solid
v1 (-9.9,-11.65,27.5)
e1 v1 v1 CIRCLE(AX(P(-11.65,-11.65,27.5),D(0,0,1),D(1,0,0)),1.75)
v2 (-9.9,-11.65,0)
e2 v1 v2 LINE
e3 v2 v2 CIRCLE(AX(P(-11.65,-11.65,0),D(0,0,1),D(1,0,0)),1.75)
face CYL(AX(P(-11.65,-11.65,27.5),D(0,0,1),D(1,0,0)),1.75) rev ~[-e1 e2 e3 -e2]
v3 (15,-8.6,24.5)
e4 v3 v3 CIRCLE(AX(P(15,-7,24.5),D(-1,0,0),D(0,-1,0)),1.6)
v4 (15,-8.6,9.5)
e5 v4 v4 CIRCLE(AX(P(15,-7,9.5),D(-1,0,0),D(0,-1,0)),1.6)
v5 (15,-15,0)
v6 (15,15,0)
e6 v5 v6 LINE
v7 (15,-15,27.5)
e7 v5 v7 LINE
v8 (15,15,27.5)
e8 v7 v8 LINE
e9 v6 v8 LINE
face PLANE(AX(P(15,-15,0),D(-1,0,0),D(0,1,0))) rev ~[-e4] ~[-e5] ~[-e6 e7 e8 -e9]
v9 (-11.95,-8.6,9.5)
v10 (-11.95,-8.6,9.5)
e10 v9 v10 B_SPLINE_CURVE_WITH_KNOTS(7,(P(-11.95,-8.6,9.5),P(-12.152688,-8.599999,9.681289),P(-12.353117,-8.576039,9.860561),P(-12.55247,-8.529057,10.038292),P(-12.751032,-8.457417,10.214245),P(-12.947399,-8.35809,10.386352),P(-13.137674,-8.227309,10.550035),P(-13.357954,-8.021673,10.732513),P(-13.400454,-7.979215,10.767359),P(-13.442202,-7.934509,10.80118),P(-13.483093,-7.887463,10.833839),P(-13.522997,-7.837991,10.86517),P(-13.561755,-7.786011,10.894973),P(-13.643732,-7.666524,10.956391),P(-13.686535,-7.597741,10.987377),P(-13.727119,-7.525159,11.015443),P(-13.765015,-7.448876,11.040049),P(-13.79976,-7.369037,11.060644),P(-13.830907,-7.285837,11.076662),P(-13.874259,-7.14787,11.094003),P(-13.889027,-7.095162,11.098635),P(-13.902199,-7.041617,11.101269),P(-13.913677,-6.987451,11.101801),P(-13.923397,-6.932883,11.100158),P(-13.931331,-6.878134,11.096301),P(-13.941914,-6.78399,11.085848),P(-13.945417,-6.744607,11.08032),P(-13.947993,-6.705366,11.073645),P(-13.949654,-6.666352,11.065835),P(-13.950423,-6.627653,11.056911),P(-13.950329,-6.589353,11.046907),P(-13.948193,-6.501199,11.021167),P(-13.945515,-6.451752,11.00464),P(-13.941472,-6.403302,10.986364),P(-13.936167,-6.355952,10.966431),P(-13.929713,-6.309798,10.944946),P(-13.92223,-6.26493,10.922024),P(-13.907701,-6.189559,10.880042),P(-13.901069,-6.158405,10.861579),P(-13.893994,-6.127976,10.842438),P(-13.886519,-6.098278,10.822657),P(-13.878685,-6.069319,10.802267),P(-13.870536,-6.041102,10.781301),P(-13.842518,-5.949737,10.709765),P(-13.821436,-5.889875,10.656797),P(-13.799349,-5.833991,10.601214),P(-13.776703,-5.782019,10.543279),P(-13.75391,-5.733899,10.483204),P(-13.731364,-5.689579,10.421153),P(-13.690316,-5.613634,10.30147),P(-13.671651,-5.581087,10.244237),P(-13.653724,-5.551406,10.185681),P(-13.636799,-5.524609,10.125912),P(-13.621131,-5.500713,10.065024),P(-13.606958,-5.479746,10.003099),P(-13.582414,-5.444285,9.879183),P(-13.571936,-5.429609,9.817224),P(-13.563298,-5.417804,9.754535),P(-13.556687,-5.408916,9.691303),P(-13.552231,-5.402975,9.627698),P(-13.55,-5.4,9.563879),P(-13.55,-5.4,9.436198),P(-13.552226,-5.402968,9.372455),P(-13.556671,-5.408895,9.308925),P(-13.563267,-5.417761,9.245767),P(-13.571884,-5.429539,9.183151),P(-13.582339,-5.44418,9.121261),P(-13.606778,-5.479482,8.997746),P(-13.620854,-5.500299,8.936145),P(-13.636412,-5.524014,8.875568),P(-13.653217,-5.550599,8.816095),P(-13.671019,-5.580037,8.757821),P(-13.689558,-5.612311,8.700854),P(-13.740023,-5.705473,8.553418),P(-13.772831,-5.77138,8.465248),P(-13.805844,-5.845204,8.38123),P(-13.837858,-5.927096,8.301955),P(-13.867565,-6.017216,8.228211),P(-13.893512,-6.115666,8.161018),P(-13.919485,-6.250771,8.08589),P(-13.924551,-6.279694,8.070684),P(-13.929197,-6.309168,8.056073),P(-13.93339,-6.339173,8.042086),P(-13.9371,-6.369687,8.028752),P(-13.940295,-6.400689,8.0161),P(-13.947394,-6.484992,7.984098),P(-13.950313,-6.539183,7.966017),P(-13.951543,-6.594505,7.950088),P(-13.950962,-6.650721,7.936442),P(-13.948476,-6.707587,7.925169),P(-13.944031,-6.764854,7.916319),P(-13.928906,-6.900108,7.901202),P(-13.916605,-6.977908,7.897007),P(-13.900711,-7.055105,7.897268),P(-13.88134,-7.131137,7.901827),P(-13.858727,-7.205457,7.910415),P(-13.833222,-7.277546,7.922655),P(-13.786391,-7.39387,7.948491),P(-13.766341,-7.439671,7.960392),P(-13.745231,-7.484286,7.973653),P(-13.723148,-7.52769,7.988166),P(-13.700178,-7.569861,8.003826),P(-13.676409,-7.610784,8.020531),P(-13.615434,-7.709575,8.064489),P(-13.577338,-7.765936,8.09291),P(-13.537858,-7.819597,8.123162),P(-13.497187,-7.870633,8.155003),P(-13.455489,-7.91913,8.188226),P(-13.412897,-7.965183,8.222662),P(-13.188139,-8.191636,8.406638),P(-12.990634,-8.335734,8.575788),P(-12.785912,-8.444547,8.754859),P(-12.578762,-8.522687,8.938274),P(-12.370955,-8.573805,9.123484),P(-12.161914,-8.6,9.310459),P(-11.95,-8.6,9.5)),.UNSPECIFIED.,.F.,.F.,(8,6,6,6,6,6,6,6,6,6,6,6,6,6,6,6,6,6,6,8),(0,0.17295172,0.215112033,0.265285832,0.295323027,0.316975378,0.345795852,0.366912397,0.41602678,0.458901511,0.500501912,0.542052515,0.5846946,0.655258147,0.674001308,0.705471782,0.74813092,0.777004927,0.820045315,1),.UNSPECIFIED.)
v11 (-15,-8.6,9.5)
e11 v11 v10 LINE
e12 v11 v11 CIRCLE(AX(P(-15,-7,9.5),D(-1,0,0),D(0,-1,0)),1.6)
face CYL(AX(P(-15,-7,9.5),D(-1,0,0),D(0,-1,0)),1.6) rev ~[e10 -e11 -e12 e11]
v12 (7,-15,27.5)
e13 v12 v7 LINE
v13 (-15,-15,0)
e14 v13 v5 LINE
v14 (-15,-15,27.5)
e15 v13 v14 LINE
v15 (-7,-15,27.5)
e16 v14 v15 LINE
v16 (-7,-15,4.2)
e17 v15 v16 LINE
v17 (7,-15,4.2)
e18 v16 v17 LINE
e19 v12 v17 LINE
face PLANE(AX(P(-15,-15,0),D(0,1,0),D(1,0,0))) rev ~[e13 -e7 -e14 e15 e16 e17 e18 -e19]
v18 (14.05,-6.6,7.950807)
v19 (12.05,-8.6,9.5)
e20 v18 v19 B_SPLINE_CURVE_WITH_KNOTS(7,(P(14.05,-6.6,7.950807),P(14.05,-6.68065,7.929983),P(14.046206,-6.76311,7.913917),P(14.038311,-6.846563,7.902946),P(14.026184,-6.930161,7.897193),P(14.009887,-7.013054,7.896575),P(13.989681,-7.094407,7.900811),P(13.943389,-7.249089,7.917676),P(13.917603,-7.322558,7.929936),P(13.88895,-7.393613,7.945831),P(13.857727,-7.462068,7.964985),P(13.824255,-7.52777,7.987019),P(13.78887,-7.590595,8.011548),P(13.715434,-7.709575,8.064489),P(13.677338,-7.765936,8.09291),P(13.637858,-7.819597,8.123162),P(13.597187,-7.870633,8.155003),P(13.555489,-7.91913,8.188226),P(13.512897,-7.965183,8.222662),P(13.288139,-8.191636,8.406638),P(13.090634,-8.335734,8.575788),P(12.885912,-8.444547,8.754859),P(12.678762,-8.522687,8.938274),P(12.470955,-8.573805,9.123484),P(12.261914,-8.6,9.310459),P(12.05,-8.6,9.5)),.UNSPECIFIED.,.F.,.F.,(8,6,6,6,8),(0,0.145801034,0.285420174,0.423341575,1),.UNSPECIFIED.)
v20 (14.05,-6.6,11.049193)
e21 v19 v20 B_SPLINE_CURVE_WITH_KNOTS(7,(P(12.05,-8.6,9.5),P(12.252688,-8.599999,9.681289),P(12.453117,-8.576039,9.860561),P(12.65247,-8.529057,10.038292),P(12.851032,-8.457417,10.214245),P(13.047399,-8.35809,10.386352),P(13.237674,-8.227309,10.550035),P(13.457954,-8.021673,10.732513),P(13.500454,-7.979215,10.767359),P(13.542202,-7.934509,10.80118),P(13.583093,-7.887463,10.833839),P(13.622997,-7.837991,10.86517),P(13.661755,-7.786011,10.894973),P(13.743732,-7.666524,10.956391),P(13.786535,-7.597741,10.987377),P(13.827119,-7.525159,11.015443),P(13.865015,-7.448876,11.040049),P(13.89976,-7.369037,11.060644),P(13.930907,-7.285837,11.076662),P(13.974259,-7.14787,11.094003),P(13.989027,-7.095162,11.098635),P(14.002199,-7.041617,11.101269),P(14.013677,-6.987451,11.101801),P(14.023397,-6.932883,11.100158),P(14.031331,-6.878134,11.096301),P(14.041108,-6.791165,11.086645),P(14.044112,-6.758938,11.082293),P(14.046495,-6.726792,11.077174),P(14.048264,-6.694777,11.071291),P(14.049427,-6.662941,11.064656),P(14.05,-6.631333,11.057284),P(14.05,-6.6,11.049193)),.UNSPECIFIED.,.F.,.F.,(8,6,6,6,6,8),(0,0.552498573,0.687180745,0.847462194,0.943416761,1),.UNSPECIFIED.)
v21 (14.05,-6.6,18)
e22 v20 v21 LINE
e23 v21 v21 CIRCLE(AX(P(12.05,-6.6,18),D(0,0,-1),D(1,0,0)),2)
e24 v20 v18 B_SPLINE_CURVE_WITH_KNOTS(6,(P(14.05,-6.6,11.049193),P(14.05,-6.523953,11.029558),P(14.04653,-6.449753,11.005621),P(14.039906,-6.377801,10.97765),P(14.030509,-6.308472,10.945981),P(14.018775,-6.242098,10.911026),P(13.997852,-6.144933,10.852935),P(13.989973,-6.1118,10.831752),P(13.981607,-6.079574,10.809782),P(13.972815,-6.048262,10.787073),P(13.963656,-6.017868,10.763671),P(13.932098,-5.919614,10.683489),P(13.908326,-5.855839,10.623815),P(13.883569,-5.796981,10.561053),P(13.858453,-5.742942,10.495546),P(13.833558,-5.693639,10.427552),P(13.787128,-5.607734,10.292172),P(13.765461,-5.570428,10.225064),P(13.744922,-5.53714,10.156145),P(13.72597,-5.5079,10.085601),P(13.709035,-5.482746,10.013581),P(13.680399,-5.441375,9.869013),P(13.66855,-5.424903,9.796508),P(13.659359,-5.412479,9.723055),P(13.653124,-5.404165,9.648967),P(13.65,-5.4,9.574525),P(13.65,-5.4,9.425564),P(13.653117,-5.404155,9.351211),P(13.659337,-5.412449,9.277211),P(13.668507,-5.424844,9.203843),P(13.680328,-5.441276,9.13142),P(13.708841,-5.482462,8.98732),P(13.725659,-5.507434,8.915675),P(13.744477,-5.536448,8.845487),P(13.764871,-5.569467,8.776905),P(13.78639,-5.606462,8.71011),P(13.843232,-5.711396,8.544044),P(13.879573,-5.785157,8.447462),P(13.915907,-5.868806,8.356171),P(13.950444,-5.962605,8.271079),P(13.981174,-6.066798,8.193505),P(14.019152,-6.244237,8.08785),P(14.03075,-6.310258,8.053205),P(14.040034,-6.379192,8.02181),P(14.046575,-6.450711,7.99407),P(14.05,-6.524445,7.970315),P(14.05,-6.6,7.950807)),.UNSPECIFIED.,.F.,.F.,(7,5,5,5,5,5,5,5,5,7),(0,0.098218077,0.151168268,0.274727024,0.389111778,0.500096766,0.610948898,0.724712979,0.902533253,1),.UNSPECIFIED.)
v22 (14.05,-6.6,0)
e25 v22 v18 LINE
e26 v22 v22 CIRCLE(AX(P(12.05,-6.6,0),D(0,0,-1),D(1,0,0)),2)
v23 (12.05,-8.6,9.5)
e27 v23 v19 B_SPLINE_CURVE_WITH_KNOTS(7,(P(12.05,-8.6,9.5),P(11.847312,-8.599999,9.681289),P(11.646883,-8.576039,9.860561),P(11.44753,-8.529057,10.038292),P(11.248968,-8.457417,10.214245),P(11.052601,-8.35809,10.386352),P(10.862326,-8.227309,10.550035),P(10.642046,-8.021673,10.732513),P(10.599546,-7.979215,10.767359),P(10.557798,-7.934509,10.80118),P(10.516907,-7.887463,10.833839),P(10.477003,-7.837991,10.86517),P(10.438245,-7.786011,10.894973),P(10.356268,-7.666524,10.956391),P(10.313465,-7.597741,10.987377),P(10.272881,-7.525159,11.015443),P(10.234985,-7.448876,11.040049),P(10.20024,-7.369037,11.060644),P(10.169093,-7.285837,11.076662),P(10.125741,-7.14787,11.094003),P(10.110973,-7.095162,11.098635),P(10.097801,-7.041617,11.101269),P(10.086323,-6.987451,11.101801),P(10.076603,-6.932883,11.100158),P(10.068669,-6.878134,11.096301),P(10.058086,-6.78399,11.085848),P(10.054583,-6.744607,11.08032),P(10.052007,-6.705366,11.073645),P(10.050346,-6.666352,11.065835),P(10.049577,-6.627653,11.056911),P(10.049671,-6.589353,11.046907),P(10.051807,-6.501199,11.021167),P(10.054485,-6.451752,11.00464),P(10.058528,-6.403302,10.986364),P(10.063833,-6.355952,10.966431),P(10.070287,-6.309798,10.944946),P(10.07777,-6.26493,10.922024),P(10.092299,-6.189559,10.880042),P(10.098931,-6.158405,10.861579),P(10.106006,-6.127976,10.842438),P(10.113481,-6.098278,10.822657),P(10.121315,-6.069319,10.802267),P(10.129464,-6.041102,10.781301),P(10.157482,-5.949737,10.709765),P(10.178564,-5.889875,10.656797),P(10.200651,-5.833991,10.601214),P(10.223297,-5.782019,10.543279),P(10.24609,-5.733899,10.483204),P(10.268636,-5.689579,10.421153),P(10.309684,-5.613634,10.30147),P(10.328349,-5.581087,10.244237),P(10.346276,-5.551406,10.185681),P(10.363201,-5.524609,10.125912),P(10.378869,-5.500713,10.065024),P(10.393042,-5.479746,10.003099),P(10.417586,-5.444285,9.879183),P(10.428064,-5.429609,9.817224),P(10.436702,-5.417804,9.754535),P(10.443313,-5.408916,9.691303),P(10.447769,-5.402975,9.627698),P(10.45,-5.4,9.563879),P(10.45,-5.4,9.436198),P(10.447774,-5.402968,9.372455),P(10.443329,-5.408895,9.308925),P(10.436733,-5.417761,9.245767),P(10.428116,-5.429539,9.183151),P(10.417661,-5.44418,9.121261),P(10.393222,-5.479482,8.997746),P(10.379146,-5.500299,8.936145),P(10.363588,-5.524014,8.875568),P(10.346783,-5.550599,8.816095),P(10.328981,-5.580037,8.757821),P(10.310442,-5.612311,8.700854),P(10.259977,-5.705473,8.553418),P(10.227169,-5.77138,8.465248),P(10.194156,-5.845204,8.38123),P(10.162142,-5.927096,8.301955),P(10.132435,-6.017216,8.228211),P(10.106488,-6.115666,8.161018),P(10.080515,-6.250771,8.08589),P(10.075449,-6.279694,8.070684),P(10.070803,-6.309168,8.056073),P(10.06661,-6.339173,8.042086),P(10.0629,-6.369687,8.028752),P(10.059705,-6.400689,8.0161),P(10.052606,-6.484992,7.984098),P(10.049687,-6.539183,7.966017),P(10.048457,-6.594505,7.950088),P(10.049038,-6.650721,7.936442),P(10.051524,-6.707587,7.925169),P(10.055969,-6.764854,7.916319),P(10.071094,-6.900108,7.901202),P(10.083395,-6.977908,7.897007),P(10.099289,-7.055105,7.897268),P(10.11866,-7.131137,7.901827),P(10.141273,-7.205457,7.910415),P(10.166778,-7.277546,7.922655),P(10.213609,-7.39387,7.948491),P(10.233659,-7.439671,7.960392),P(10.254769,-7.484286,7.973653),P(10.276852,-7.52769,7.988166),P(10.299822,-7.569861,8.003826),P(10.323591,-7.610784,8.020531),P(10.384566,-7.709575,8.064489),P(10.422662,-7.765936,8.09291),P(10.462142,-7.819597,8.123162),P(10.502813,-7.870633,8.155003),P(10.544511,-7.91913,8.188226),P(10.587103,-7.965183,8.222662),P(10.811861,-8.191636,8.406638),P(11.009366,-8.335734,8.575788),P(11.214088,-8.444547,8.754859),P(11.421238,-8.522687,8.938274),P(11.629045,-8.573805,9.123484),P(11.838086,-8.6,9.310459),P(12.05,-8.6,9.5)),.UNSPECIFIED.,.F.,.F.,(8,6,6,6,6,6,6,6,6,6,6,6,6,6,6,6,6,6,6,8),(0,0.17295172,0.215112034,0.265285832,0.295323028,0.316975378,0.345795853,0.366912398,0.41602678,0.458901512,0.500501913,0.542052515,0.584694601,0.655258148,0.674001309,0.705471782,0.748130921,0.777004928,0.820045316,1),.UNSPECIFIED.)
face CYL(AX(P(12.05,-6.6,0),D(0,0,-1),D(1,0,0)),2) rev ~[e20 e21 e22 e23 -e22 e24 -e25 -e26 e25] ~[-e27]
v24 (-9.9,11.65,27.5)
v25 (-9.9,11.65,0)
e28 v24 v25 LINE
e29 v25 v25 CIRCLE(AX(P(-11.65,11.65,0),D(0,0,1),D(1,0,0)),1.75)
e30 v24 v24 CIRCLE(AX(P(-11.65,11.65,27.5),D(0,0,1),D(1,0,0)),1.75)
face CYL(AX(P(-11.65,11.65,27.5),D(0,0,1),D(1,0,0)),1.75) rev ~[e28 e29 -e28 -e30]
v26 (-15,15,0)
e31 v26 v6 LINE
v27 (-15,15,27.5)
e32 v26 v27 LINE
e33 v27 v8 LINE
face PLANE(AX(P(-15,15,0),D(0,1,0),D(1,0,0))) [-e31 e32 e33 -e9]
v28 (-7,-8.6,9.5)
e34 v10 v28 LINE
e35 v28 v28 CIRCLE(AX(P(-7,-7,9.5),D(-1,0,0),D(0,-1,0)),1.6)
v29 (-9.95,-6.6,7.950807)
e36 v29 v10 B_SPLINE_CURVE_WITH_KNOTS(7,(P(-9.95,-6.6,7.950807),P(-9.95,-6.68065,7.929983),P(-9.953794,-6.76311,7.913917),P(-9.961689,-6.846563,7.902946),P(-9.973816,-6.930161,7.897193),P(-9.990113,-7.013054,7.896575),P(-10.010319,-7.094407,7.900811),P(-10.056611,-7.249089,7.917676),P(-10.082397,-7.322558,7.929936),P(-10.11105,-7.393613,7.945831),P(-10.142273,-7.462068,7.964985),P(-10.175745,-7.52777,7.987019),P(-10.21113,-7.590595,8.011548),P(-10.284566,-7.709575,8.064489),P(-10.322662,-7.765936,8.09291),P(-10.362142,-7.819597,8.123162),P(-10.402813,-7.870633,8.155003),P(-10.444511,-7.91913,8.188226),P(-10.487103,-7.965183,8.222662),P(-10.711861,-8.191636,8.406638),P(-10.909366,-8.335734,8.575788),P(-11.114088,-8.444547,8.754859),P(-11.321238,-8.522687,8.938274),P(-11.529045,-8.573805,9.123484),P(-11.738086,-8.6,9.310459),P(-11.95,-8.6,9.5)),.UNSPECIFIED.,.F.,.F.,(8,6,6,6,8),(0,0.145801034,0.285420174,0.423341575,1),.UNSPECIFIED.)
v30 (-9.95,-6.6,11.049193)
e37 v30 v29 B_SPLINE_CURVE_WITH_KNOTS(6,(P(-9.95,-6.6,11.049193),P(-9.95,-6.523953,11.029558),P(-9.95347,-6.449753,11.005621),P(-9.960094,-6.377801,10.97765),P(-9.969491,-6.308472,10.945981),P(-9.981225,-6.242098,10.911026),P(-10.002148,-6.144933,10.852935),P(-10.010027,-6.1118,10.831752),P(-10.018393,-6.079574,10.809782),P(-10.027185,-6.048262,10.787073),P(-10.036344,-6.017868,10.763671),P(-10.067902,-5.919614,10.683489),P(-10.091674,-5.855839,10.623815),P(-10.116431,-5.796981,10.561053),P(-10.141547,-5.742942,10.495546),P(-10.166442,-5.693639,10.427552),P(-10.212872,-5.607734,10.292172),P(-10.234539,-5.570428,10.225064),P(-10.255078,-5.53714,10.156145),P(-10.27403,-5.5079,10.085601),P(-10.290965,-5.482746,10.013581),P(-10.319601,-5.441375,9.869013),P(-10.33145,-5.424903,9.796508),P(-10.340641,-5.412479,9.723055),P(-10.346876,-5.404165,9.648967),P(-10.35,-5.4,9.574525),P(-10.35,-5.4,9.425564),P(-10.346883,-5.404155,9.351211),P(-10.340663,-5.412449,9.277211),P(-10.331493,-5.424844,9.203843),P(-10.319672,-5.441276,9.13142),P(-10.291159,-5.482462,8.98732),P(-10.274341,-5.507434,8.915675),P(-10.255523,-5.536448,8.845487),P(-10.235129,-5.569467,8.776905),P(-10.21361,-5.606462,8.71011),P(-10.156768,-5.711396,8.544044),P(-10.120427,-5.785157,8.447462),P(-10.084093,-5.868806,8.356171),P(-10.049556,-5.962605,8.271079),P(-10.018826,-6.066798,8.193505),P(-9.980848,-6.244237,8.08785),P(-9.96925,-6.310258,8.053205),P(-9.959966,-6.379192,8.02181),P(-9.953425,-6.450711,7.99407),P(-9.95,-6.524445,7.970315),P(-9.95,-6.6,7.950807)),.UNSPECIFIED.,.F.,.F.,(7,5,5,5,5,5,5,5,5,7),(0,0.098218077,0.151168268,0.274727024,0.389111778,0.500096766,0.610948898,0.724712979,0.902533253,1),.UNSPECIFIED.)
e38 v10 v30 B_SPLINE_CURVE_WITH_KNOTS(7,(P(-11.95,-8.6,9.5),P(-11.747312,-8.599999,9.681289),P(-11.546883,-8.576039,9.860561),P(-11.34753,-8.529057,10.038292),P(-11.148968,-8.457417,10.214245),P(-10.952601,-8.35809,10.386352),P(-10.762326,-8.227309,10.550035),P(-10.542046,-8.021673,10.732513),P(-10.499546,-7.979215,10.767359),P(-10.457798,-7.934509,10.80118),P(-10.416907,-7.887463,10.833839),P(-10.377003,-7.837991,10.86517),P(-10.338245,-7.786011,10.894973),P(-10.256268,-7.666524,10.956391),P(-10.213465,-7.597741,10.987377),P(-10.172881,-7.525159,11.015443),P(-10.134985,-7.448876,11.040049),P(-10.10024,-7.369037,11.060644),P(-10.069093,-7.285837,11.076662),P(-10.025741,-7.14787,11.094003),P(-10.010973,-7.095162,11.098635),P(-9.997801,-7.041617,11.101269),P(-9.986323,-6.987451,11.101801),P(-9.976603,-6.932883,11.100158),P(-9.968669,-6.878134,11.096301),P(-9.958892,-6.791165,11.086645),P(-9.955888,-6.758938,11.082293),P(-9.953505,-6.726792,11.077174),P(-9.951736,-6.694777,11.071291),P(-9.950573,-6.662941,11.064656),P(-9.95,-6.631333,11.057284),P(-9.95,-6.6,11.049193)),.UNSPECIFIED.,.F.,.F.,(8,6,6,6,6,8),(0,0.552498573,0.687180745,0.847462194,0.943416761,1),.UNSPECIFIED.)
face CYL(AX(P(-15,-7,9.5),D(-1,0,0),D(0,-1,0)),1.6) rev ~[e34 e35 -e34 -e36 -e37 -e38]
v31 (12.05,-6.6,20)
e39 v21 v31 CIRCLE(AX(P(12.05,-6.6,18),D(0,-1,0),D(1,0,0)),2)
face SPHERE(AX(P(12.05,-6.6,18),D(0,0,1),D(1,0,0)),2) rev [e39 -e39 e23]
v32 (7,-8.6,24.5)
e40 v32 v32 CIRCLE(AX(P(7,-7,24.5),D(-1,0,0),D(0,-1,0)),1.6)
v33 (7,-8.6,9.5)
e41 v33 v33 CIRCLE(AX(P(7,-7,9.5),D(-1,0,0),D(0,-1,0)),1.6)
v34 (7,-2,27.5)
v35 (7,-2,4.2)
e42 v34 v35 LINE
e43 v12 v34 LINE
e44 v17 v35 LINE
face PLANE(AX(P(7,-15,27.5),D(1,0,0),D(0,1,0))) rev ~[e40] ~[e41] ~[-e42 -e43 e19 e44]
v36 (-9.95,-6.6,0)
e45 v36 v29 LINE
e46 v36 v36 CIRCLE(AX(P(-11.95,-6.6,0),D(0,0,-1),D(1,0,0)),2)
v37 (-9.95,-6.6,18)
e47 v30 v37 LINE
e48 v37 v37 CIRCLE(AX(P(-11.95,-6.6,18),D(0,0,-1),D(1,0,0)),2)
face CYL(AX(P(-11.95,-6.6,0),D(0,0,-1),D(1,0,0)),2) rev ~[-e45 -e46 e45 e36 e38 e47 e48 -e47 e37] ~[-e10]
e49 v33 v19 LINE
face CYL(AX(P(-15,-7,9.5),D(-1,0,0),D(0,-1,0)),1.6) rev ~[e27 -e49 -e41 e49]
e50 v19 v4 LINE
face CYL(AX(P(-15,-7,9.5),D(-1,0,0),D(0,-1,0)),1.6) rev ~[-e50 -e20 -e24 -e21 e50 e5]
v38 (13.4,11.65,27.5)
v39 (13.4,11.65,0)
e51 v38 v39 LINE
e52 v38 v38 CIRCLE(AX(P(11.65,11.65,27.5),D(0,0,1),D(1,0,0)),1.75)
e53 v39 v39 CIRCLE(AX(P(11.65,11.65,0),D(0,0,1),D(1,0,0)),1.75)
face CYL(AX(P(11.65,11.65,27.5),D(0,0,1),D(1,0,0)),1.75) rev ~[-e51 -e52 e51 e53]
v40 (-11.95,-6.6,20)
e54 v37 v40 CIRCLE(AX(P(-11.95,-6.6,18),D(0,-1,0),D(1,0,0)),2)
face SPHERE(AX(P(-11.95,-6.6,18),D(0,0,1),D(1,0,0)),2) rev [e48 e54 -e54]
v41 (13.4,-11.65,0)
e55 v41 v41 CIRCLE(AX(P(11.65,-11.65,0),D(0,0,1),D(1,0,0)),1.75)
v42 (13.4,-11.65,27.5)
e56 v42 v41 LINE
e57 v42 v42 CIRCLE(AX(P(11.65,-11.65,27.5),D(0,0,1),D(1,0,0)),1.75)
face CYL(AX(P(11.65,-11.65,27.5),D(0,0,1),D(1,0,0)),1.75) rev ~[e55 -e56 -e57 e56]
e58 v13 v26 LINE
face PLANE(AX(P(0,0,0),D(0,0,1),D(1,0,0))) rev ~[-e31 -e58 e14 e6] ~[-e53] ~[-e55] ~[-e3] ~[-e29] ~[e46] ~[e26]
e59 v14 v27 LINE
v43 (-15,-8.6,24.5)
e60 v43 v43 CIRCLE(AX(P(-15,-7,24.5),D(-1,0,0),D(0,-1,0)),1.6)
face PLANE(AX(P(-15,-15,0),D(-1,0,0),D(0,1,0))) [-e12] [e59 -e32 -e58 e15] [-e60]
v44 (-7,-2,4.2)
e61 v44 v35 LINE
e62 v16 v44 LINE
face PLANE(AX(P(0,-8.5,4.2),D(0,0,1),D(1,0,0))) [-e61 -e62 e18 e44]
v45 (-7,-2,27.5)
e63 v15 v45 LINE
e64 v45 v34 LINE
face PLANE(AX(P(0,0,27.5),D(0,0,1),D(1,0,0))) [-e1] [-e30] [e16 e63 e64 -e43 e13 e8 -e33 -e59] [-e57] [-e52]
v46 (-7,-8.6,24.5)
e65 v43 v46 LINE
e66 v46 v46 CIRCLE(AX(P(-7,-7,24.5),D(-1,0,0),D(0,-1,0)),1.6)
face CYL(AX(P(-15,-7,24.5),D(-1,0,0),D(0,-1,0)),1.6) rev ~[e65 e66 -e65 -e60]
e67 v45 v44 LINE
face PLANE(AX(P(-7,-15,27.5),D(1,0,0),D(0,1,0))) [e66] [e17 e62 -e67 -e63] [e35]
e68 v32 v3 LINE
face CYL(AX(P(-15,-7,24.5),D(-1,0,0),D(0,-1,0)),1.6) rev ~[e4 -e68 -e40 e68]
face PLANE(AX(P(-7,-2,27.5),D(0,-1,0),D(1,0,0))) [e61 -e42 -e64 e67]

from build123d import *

# Parameters (mm, degrees)
F0_W      = 30
F0_H      = 30
F1_DEPTH  = 27.5
F2_R      = 1.75
F3_DEPTH  = 27.501
F4_R      = 2
F5_DEPTH  = 20
F6_R      = 2
F7_W      = 14
F7_H      = 13
F8_DEPTH  = 23.3
F9_R      = 1.6
F10_DEPTH = 30.001


# Not quite as in the source:
# - a feature names something its author has since deleted; it is built from what else it names


with BuildPart() as f1:
    # F0 (on Top) → F1 (new body)
    with BuildSketch(Plane.XY):
        Rectangle(F0_W, F0_H)
    extrude(amount=F1_DEPTH)

    # F2 (on face) → F3 (cut, through all)
    with BuildSketch(Plane.XY.offset(27.5)):
        with Locations((-11.65, 11.65)):
            Circle(F2_R)
        with Locations((-11.65, -11.65)):
            Circle(F2_R)
        with Locations((11.65, 11.65)):
            Circle(F2_R)
        with Locations((11.65, -11.65)):
            Circle(F2_R)
    extrude(amount=-F3_DEPTH, mode=Mode.SUBTRACT)

    # F4 (on face) → F5 (cut)
    with BuildSketch(Plane(origin=(0, 0, 0), x_dir=(1, 0, 0), z_dir=(0, 0, -1))):
        with Locations((-11.95, 6.6)):
            Circle(F4_R)
        with Locations((12.05, 6.6)):
            Circle(F4_R)
    extrude(amount=-F5_DEPTH, mode=Mode.SUBTRACT)

    # F6
    f6_edges = [f1.edges().sort_by_distance(p)[0] for p in [
        (-13.95, -6.6, 20),
        (10.05, -6.6, 20),
    ]]
    fillet(f6_edges, radius=F6_R)

    # F7 (on face) → F8 (cut)
    with BuildSketch(Plane.XY.offset(27.5)):
        with Locations((0, -8.5)):
            Rectangle(F7_W, F7_H)
    extrude(amount=-F8_DEPTH, mode=Mode.SUBTRACT)

    # F9 (on face) → F10 (cut, through all)
    with BuildSketch(Plane(origin=(-15, 0, 0), x_dir=(0, -1, 0), z_dir=(-1, 0, 0))):
        with Locations((7, 9.5)):
            Circle(F9_R)
        with Locations((7, 24.5)):
            Circle(F9_R)
    extrude(amount=-F10_DEPTH, mode=Mode.SUBTRACT)


solid = f1.part
